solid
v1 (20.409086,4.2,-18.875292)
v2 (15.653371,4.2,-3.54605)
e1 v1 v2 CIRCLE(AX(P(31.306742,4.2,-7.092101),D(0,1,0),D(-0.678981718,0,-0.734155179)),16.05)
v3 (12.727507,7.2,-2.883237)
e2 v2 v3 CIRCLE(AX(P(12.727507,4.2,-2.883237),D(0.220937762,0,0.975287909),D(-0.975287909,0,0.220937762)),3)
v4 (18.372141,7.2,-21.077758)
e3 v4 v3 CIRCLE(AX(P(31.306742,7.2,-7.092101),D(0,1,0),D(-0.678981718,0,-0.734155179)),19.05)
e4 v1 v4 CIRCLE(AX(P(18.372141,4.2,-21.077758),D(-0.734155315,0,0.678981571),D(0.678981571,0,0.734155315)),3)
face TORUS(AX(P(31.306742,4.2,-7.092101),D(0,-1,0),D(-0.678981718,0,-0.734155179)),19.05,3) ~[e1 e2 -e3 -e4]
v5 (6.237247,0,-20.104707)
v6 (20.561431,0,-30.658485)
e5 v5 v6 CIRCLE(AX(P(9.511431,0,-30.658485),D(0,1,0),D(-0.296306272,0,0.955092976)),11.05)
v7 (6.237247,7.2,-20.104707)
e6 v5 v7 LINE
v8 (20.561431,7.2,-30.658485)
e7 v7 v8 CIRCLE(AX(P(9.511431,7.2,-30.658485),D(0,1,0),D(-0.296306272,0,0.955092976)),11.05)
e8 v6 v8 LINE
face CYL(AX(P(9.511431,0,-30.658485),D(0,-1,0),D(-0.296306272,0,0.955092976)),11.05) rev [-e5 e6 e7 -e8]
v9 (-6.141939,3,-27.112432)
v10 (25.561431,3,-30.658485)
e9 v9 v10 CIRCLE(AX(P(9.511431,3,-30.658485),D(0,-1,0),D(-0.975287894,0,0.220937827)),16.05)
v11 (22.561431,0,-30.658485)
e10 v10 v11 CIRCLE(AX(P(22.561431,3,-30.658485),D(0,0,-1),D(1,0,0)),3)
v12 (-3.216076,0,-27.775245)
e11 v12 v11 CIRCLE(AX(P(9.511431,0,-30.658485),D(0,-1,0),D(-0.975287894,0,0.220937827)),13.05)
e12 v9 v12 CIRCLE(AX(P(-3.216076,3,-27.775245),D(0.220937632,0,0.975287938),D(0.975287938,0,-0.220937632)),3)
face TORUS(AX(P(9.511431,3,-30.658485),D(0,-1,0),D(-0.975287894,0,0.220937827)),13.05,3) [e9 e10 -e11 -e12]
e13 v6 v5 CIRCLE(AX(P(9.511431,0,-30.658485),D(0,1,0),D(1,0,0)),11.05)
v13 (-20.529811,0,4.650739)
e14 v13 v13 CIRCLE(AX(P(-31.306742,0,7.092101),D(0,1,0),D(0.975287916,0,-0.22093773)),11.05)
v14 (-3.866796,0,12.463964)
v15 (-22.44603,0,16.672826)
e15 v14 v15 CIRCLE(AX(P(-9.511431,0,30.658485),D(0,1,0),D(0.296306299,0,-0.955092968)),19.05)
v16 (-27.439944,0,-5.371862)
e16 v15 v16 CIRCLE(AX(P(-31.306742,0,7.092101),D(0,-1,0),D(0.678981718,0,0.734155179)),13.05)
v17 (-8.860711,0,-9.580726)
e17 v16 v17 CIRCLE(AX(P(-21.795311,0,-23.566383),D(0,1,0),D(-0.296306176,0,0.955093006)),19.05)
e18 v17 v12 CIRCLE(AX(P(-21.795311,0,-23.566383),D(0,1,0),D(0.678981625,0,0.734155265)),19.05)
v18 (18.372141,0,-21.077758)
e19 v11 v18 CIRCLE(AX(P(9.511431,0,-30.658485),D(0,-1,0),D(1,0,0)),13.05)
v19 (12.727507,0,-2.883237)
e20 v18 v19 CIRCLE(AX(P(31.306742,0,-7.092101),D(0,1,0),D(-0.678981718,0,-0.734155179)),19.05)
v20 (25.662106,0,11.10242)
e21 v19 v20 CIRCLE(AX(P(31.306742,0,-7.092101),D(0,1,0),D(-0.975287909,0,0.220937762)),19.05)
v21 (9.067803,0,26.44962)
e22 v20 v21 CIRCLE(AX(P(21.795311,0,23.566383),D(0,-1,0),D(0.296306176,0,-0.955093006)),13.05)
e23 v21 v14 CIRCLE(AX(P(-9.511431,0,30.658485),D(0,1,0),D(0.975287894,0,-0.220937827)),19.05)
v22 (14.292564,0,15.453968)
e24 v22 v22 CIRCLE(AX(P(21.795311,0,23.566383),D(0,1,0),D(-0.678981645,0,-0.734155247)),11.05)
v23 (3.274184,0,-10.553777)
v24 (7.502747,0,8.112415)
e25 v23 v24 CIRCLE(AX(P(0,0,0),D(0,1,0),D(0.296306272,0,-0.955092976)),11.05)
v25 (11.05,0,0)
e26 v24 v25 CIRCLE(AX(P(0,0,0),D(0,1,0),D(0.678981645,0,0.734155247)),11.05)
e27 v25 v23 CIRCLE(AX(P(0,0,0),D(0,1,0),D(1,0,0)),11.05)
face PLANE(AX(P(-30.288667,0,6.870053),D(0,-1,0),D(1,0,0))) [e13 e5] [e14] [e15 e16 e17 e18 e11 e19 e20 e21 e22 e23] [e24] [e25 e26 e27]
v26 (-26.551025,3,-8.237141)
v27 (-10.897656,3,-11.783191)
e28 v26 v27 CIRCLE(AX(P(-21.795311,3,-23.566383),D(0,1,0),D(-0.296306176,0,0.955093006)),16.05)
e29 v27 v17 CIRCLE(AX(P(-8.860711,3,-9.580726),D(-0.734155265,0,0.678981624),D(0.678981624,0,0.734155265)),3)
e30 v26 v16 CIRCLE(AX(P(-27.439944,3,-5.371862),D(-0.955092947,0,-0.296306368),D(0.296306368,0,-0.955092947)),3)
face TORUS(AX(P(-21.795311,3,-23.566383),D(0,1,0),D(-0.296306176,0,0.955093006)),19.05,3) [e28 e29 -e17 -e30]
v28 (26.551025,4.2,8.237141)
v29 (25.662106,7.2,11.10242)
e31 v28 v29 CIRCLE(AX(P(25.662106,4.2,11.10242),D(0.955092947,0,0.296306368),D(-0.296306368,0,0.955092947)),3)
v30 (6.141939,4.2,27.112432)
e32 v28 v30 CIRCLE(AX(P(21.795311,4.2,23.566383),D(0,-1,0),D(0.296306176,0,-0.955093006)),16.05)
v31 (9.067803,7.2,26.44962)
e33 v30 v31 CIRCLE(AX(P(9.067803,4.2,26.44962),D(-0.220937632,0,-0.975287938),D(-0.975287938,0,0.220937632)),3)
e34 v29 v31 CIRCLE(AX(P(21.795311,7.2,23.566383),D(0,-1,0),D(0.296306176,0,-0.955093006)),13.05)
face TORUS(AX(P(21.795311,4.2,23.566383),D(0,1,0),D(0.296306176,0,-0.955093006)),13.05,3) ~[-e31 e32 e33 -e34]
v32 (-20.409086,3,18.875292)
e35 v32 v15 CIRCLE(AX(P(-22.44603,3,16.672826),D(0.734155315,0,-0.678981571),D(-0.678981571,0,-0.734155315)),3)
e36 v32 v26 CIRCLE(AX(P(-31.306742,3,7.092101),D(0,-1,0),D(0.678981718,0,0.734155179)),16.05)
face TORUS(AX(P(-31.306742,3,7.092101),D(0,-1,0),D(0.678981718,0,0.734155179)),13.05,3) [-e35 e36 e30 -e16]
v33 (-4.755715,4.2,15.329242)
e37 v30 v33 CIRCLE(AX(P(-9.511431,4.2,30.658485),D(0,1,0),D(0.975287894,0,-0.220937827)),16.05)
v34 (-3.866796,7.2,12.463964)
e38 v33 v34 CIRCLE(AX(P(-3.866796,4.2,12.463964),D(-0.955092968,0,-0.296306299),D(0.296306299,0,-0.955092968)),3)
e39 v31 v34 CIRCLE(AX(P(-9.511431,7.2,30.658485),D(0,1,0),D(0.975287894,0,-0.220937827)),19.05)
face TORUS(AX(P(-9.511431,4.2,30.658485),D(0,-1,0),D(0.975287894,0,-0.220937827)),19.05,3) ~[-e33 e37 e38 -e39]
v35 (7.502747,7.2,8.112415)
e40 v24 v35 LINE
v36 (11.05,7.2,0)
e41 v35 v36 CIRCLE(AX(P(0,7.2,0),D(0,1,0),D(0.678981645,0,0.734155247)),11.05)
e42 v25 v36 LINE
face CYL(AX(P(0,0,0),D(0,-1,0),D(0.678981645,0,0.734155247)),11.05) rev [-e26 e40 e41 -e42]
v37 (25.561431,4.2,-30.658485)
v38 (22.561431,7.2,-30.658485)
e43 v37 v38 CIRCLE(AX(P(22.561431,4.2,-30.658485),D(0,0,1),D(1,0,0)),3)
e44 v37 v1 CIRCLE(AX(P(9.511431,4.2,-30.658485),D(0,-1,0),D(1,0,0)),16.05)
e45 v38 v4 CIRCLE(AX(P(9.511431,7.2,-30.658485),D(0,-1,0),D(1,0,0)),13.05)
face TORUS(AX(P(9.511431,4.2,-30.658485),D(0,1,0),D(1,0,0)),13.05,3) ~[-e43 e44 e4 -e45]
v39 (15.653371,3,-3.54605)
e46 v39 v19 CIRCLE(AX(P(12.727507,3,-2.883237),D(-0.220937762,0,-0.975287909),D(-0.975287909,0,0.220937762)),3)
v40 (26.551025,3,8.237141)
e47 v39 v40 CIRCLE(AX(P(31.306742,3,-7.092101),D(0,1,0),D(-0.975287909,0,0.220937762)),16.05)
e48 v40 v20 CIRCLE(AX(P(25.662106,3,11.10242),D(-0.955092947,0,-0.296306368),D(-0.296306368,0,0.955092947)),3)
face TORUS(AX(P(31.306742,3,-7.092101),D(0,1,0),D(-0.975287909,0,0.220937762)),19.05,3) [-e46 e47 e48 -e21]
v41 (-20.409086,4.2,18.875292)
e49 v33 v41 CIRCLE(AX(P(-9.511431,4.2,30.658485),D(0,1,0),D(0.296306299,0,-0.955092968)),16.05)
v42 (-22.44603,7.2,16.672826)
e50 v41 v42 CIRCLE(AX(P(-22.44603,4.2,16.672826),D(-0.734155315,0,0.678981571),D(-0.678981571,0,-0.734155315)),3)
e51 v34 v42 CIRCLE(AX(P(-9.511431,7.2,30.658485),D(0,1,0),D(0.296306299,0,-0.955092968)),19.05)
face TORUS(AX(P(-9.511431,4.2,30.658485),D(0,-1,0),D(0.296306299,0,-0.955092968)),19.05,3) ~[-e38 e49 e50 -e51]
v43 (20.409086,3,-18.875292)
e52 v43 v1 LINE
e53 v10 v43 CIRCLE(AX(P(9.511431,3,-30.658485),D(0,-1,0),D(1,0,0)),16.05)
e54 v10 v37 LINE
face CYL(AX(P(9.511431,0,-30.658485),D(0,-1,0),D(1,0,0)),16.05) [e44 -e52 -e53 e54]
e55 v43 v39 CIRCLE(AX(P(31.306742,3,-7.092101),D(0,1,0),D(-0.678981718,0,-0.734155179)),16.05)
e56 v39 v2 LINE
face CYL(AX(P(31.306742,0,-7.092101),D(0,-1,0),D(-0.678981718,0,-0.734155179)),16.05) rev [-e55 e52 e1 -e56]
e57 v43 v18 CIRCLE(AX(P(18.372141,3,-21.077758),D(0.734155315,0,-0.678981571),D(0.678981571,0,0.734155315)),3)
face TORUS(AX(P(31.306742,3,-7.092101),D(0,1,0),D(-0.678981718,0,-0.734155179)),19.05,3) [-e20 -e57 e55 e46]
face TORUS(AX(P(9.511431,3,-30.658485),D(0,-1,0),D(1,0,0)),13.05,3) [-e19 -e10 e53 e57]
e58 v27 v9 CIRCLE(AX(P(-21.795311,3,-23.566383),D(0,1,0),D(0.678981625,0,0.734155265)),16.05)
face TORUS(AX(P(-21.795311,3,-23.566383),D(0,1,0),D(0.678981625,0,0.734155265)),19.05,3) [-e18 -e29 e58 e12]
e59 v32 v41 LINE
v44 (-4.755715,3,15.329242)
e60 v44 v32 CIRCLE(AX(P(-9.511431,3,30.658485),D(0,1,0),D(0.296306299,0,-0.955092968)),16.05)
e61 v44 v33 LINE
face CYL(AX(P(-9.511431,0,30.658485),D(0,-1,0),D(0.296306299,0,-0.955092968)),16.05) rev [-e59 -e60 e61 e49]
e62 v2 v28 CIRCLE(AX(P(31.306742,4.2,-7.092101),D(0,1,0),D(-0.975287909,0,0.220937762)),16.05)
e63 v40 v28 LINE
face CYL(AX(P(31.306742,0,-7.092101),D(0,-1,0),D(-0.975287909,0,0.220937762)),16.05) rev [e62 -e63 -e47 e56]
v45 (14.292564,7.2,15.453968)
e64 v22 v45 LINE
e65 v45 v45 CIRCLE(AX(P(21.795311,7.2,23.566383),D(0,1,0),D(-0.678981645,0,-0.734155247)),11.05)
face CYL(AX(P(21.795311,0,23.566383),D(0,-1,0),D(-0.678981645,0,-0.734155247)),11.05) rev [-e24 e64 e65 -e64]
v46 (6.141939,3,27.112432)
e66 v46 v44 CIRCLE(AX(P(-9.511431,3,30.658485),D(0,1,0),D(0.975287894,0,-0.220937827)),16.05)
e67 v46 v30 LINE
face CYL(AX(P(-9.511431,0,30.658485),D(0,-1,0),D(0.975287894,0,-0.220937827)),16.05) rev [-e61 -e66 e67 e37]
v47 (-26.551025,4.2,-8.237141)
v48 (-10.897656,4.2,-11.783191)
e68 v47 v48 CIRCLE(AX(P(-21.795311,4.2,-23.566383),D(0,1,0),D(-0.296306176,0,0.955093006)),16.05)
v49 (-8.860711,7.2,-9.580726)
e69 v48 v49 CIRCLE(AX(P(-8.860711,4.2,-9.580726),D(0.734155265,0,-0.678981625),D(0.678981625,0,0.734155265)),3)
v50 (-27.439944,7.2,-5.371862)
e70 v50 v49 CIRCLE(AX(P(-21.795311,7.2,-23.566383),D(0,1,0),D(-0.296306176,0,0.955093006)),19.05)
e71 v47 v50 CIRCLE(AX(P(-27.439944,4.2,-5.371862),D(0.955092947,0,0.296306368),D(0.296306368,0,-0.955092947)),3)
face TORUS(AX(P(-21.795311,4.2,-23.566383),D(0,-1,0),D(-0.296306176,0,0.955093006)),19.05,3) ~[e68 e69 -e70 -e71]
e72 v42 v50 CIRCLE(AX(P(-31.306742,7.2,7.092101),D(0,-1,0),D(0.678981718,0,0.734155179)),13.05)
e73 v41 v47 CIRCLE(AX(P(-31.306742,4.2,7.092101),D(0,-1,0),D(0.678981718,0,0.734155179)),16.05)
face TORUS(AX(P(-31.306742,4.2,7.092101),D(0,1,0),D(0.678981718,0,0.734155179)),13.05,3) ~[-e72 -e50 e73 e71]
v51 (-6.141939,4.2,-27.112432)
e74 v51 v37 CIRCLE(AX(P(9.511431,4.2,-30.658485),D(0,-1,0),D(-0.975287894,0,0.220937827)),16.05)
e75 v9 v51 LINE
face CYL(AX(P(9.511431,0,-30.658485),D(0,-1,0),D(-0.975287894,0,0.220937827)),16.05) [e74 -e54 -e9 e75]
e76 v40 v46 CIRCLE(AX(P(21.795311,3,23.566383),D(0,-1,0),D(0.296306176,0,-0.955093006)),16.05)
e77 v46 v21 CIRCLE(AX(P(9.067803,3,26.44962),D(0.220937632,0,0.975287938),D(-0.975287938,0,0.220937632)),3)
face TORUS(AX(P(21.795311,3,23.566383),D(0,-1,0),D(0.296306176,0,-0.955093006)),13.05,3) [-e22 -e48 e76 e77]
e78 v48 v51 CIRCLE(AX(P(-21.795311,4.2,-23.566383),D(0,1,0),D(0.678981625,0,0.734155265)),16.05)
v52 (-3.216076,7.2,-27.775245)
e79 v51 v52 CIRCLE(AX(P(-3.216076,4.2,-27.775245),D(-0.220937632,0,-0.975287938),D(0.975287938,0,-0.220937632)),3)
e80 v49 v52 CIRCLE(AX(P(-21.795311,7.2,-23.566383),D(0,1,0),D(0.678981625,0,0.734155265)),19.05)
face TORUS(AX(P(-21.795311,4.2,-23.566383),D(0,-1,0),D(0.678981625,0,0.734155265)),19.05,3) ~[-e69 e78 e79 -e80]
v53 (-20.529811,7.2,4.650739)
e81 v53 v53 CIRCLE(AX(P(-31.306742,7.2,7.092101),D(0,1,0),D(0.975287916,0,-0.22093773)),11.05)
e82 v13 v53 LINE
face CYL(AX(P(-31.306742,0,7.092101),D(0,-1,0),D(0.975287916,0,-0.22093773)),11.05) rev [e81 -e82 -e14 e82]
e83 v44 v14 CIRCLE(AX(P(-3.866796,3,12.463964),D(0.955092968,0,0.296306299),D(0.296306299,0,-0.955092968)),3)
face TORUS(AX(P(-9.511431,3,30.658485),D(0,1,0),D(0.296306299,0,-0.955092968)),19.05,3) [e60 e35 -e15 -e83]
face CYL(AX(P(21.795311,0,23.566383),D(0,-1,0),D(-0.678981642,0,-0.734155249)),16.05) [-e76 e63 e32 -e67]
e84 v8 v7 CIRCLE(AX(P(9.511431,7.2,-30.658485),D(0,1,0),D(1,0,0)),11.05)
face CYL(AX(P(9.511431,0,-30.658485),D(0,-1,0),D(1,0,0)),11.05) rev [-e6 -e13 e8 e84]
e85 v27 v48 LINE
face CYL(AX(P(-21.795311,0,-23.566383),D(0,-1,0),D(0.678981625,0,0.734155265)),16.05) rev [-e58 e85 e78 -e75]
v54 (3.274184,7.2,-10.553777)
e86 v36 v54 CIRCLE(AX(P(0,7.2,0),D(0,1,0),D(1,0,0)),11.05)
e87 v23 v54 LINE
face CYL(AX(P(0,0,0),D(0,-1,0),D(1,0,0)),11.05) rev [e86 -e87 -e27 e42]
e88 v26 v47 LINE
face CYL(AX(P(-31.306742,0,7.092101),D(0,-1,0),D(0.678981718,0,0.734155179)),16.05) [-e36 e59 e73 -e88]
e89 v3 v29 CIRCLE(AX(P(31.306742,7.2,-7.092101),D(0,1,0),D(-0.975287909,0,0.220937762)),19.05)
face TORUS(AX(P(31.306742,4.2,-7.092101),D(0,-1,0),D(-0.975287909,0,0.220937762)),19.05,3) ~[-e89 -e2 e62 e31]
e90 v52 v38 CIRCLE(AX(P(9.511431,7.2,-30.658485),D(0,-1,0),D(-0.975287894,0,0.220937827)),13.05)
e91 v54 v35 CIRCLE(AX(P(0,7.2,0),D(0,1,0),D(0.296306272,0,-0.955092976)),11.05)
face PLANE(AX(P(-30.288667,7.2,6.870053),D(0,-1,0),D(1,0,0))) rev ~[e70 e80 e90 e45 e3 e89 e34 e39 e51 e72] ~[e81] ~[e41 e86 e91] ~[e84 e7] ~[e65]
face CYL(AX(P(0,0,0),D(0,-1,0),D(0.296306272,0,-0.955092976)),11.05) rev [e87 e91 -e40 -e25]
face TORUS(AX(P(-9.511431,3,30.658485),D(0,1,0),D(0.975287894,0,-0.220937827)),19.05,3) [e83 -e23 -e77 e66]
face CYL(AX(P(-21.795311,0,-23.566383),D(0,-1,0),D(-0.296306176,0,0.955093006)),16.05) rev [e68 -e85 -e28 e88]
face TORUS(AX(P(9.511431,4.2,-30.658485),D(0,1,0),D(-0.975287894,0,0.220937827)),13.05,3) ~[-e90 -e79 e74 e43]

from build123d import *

# Parameters (mm, degrees)
F1_DEPTH = 7.2
F2_R     = 3


# Not quite as in the source:
# - ends of sketch curves that miss each other by under 0.0002 mm in the source are joined


with BuildPart() as f1:
    # F0 (on Front) → F1 (new body)
    with BuildSketch(Plane.XZ):
        with BuildLine():
            ThreePointArc((-26.551024914, -8.237140674), (-19.523549824, -3.8055536516), (-15.6533710357, 3.546050651))
            ThreePointArc((-15.6533710357, 3.546050651), (-15.3562075484, 5.3080195325), (-15.256742113, 7.0921011182))
            ThreePointArc((-15.256742113, 7.0921011182), (-16.6011328418, 13.5223076439), (-20.4090855352, 18.875291735))
            ThreePointArc((-20.4090855352, 18.875291735), (-46.9601131695, 10.6381516773), (-26.551024914, -8.237140674))
        make_face()
        with BuildLine():
            ThreePointArc((-20.256742113, 7.0921011182), (-20.3252214351, 5.8638081562), (-20.529810638, 4.6507392068))
            ThreePointArc((-20.529810638, 4.6507392068), (-42.2882627909, 8.3203940802), (-20.256742113, 7.0921011182))
        make_face(mode=Mode.SUBTRACT)
        with BuildLine():
            ThreePointArc((-15.256742113, 7.0921011182), (-15.3562075484, 5.3080195325), (-15.6533710357, 3.546050651))
            ThreePointArc((-15.6533710357, 3.546050651), (-11.7831915214, 10.8976555997), (-4.7557152197, 15.3292424062))
            ThreePointArc((-4.7557152197, 15.3292424062), (-13.0574808704, 15.0051132532), (-20.4090855352, 18.875291735))
            ThreePointArc((-20.4090855352, 18.875291735), (-16.6011328418, 13.5223076439), (-15.256742113, 7.0921011182))
        make_face()
        with BuildLine():
            ThreePointArc((-4.7557152197, 15.3292424062), (3.5460508162, 15.6533709983), (10.8976554434, 11.783191666))
            ThreePointArc((10.8976554434, 11.783191666), (6.46606877, 18.8106669593), (6.1419393788, 27.112432409))
            ThreePointArc((6.1419393788, 27.112432409), (2.2717599984, 19.7608287216), (-4.7557152197, 15.3292424062))
        make_face()
        with BuildLine():
            ThreePointArc((-10.776931475, 2.4413619114), (-3.2741843024, 10.5537773879), (7.5027471726, 8.1124154765))
            Line((7.5027471726, 8.1124154765), (10.8976553955, 11.7831917102))
            ThreePointArc((10.8976554434, 11.783191666), (3.5460508162, 15.6533709983), (-4.7557152197, 15.3292424062))
            ThreePointArc((-4.7557152197, 15.3292424062), (-11.7831915214, 10.8976555997), (-15.6533710357, 3.546050651))
            Line((-15.6533710565, 3.5460505591), (-10.776931475, 2.4413619114))
        make_face()
        with BuildLine():
            ThreePointArc((6.1419393788, 27.112432409), (6.46606877, 18.8106669593), (10.8976554434, 11.783191666))
            ThreePointArc((10.8976554434, 11.783191666), (18.2492594785, 7.9130125347), (26.551024914, 8.237140674))
            ThreePointArc((26.551024914, 8.237140674), (34.7168376295, 14.0460554763), (37.8453107911, 23.5663834205))
            ThreePointArc((37.8453107911, 23.5663834205), (23.5793916234, 39.5169180693), (6.1419393788, 27.112432409))
        make_face()
        with BuildLine():
            ThreePointArc((32.8453107911, 23.5663834205), (26.2223382217, 13.4419610602), (14.2925636184, 15.453967944))
            ThreePointArc((14.2925636184, 15.453967944), (17.3682833605, 33.6908057807), (32.8453107911, 23.5663834205))
        make_face(mode=Mode.SUBTRACT)
        with BuildLine():
            ThreePointArc((26.551024914, 8.237140674), (18.2492594785, 7.9130125347), (10.8976554434, 11.783191666))
            ThreePointArc((10.8976554434, 11.783191666), (14.7056089617, 6.4302072336), (16.05, 0))
            ThreePointArc((16.05, 0), (15.9505345891, -1.7840813666), (15.6533711747, -3.5460500371))
            ThreePointArc((15.6533711747, -3.5460500371), (19.5235500377, 3.8055538826), (26.551024914, 8.237140674))
        make_face()
        with BuildLine():
            ThreePointArc((15.6533711747, -3.5460500371), (11.7831918467, -10.8976552479), (4.7557155338, -15.3292423088))
            ThreePointArc((4.7557155338, -15.3292423088), (13.0574810308, -15.0051132896), (20.4090855352, -18.875291735))
            ThreePointArc((20.4090855352, -18.875291735), (15.9774995258, -11.8478157546), (15.6533711747, -3.5460500371))
        make_face()
        with BuildLine():
            ThreePointArc((7.5027471726, 8.1124154765), (10.1244223603, 4.4270274306), (11.05, 0))
            ThreePointArc((11.05, 0), (8.8961293983, -6.5544932473), (3.2741843024, -10.5537773879))
            Line((3.2741843024, -10.5537773879), (4.755715661, -15.3292422693))
            ThreePointArc((4.755715661, -15.3292422693), (11.7831918467, -10.8976552479), (15.6533711747, -3.5460500371))
            ThreePointArc((15.6533711747, -3.5460500371), (15.9505345891, -1.7840813666), (16.05, 0))
            ThreePointArc((16.05, 0), (14.7056089617, 6.4302072336), (10.8976554434, 11.783191666))
            Line((10.8976554434, 11.783191666), (7.5027471726, 8.1124154765))
        make_face()
        with BuildLine():
            Line((4.755715661, -15.3292422693), (3.2741843024, -10.5537773879))
            ThreePointArc((3.2741843024, -10.5537773879), (-7.5027471726, -8.1124154765), (-10.776931475, 2.4413619114))
            Line((-10.776931475, 2.4413619114), (-15.6533710565, 3.5460505591))
            ThreePointArc((-15.6533710565, 3.5460505591), (-15.3292423483, -4.7557154063), (-10.8976557178, -11.7831914121))
            ThreePointArc((-10.8976557178, -11.7831914121), (-3.5460508381, -15.6533709933), (4.755715661, -15.3292422693))
        make_face()
        with BuildLine():
            ThreePointArc((-10.8976557178, -11.7831914121), (-15.3292423483, -4.7557154063), (-15.6533710357, 3.546050651))
            ThreePointArc((-15.6533710357, 3.546050651), (-19.523549824, -3.8055536516), (-26.551024914, -8.237140674))
            ThreePointArc((-26.551024914, -8.237140674), (-18.2492596608, -7.9130124934), (-10.8976557178, -11.7831914121))
        make_face()
        with BuildLine():
            ThreePointArc((-6.1419393788, -27.112432409), (-2.2717598868, -19.7608286009), (4.7557155338, -15.3292423088))
            ThreePointArc((4.7557155338, -15.3292423088), (-3.5460508381, -15.6533709933), (-10.8976557178, -11.7831914121))
            ThreePointArc((-10.8976557178, -11.7831914121), (-6.4660688254, -18.8106667808), (-6.1419393788, -27.112432409))
        make_face()
        with BuildLine():
            ThreePointArc((20.4090855352, -18.875291735), (13.0574810308, -15.0051132896), (4.7557155338, -15.3292423088))
            ThreePointArc((4.7557155338, -15.3292423088), (-2.2717598868, -19.7608286009), (-6.1419393788, -27.112432409))
            ThreePointArc((-6.1419393788, -27.112432409), (7.7273488892, -46.6090190085), (25.5614313219, -30.6584845387))
            ThreePointArc((25.5614313219, -30.6584845387), (24.2170399479, -24.2282765375), (20.4090855352, -18.875291735))
        make_face()
        with BuildLine():
            ThreePointArc((20.5614313219, -30.6584845387), (2.9569380746, -39.5546139369), (6.2372470195, -20.1047071508))
            ThreePointArc((6.2372470195, -20.1047071508), (16.0659245692, -21.7623551404), (20.5614313219, -30.6584845387))
        make_face(mode=Mode.SUBTRACT)
    extrude(amount=-F1_DEPTH)

    # F2
    f2_edges = [f1.edges().sort_by_distance(p)[0] for p in [
        (-4.755716, 0, 15.329242),
        (-10.897655, 7.2, -11.783192),
    ]]
    fillet(f2_edges, radius=F2_R)


solid = f1.part
